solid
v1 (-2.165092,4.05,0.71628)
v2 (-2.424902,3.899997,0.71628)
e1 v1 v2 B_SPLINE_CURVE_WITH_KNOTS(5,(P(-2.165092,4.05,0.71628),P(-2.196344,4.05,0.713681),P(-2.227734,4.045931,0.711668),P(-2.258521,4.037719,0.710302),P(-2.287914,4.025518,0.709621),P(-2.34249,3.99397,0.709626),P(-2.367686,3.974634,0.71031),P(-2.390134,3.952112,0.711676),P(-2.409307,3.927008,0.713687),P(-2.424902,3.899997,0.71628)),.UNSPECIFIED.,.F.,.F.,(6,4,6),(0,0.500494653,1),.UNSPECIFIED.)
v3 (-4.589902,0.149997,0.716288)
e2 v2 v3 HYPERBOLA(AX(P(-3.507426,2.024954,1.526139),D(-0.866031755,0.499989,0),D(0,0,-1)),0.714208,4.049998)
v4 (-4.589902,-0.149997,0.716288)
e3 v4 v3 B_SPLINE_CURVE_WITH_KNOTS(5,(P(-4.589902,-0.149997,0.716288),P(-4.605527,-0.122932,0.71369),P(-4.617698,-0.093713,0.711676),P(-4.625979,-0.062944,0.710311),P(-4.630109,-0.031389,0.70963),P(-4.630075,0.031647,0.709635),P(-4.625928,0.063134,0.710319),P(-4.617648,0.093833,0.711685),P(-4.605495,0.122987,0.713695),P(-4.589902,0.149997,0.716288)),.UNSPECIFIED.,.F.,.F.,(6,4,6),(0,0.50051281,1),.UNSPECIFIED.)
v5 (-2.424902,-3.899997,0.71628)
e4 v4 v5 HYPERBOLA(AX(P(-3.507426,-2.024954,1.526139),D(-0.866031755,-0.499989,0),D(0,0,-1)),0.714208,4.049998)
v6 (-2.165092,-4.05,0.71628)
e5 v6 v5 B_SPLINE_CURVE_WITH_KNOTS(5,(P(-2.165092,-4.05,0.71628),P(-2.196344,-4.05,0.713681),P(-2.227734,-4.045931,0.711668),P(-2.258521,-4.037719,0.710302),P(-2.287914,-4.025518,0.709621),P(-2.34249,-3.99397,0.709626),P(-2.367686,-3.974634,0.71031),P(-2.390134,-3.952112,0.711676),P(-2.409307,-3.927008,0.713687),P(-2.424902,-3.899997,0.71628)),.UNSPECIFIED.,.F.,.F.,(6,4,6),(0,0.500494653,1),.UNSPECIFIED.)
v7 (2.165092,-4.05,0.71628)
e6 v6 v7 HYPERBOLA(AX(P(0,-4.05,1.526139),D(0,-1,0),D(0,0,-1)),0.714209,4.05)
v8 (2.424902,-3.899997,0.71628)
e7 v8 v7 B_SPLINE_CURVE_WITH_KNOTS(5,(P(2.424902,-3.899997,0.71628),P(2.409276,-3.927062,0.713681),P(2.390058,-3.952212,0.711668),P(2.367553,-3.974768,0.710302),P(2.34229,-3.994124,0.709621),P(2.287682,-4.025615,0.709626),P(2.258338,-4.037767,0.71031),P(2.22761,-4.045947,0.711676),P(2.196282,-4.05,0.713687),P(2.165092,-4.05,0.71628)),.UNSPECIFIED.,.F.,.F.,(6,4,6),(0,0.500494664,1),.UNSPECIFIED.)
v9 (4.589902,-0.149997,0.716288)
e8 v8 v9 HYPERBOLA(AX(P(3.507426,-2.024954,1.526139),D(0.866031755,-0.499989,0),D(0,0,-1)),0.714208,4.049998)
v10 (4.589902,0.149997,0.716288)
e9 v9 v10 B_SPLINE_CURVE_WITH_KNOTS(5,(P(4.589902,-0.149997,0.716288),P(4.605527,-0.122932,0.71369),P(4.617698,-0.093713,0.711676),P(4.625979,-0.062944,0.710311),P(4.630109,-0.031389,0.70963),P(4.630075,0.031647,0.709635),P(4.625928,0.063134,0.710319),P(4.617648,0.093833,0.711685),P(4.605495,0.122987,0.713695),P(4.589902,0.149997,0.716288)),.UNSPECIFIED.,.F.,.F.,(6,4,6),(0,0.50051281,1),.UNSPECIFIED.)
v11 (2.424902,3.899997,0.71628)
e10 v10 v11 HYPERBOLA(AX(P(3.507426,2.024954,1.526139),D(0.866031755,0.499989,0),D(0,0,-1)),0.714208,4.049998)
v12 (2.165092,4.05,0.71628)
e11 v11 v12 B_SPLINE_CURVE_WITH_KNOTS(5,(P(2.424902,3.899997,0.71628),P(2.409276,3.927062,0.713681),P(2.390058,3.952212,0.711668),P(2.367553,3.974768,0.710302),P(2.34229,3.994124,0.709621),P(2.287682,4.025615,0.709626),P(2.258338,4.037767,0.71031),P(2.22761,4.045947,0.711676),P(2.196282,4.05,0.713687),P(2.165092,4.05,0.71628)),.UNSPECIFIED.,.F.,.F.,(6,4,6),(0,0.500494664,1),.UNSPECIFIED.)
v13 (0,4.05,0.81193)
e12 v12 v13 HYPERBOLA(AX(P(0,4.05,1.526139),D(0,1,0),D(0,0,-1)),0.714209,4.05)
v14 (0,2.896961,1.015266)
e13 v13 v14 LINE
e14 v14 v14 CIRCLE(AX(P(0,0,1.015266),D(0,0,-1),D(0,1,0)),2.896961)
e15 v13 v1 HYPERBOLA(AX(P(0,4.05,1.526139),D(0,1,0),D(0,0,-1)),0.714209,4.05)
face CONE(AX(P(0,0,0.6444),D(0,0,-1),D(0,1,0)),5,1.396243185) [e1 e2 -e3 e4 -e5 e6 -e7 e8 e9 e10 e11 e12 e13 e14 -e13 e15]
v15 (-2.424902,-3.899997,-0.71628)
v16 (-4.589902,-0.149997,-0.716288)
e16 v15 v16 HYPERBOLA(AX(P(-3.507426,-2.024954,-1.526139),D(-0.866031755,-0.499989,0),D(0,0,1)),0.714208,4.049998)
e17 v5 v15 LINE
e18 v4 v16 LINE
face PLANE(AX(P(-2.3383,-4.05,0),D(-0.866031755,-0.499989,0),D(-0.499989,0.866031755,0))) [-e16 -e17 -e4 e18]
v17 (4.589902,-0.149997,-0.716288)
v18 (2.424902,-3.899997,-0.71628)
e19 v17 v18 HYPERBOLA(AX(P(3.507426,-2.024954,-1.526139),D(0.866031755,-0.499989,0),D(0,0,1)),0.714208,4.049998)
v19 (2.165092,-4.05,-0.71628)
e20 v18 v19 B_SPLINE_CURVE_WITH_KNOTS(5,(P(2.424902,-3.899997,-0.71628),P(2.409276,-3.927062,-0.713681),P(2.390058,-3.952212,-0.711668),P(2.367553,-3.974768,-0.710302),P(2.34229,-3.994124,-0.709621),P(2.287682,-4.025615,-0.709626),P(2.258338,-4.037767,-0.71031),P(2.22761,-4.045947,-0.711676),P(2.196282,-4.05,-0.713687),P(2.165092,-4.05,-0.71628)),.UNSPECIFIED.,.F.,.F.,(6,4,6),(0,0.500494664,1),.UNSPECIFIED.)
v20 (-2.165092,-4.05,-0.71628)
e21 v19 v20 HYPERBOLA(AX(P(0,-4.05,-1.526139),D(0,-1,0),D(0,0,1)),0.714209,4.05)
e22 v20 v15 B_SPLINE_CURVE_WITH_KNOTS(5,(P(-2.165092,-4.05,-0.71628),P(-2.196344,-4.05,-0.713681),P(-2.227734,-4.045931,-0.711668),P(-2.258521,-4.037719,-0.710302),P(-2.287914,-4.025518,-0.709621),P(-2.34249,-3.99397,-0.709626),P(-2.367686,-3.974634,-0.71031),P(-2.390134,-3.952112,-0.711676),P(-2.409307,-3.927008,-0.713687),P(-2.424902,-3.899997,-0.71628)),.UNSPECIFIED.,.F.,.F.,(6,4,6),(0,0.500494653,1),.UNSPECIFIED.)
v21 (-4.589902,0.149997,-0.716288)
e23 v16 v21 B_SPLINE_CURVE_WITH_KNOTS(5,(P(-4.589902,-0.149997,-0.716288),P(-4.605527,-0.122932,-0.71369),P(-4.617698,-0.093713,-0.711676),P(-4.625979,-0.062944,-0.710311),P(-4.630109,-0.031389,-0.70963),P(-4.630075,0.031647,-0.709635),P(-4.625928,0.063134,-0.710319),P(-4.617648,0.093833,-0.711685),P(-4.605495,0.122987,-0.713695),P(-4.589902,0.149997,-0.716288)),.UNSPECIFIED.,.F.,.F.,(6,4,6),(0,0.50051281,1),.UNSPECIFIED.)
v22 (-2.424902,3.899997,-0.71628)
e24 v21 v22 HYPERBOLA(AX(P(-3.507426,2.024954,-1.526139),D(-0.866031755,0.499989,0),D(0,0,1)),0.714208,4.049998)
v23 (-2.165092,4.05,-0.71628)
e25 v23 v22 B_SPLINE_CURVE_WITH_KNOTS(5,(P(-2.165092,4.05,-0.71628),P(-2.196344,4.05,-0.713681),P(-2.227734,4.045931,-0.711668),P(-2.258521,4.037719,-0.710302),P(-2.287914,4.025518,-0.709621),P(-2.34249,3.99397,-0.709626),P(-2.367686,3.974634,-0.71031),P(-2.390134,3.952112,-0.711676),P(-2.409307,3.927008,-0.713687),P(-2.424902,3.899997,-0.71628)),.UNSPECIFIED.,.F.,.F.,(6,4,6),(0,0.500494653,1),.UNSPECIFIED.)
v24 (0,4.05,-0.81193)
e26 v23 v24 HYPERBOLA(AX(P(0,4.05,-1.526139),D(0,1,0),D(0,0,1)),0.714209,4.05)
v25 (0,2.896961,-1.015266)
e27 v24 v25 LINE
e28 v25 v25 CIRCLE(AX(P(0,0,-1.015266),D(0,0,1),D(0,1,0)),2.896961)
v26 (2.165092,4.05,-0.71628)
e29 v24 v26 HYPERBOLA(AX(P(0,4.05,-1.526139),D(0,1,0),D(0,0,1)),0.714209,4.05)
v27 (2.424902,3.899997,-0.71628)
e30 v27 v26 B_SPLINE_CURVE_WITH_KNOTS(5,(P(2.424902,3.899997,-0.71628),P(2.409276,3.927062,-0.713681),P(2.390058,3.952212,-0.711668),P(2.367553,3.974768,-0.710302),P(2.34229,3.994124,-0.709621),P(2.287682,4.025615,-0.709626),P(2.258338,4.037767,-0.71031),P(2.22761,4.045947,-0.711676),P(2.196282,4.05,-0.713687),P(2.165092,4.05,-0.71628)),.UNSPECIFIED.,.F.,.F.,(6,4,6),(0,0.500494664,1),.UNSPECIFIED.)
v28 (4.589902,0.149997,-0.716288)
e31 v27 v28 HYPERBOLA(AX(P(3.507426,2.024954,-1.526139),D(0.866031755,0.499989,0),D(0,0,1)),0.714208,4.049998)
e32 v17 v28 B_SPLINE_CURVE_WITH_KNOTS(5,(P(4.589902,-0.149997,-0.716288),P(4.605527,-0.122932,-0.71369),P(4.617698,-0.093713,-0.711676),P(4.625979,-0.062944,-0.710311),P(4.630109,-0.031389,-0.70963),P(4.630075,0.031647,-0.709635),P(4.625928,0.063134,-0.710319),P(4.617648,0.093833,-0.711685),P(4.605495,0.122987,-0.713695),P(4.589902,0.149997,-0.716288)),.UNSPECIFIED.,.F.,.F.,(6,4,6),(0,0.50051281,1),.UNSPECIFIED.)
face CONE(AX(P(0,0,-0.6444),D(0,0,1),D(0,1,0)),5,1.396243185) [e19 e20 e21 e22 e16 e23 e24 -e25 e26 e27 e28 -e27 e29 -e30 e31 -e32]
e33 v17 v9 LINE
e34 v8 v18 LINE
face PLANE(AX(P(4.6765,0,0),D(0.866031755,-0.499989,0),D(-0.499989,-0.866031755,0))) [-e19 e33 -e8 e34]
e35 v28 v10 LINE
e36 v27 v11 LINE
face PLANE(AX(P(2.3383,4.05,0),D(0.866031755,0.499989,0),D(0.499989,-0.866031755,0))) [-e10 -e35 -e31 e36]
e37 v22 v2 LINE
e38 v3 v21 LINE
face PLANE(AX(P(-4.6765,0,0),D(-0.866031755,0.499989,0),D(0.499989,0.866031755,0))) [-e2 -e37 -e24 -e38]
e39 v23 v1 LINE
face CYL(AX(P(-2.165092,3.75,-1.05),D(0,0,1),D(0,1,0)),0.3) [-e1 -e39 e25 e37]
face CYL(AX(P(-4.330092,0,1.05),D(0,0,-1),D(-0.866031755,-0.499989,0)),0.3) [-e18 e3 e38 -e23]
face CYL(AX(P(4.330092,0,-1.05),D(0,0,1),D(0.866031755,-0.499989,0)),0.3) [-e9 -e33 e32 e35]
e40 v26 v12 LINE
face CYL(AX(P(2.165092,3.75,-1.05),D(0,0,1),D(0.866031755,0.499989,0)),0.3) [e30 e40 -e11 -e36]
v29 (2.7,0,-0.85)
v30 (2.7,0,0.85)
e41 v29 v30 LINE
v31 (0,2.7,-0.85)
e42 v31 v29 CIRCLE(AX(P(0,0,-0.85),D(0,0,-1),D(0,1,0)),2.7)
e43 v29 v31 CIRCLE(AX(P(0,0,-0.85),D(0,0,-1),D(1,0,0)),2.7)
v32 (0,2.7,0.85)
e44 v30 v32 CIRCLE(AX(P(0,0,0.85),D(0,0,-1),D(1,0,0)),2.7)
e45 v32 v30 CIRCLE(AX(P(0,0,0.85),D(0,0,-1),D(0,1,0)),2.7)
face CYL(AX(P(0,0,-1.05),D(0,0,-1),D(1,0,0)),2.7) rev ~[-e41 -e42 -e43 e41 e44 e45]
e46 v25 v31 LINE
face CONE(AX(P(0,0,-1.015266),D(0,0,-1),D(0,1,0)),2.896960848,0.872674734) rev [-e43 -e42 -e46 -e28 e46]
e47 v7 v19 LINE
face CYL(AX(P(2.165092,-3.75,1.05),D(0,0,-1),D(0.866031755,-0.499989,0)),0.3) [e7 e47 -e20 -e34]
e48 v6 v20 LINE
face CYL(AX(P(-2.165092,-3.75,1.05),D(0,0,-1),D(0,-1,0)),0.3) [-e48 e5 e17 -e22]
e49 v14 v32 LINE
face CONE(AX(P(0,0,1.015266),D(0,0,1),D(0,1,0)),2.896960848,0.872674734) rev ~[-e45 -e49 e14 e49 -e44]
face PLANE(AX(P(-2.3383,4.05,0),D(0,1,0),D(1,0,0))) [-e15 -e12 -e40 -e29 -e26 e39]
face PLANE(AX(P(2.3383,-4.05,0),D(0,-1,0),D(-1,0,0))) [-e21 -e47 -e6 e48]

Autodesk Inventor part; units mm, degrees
ref_plane "YZ Plane" through (0, 0, 0) normal (1, 0, 0) x (0, 1, 0)
ref_plane "XZ Plane" through (0, 0, 0) normal (0, 1, 0) x (-1, 0, 0)
ref_plane "XY Plane" through (0, 0, 0) normal (0, 0, 1) x (1, 0, 0)
sketch "Sketch1" plane through (0, 0, 0) normal (0, 0, 1) x (1, 0, 0)
  line L0 (4.6765, 0) -> (2.3383, -4.05)
  line L1 (2.3383, -4.05) -> (-2.3383, -4.05)
  line L2 (-2.3383, -4.05) -> (-4.6765, 0)
  line L3 (-4.6765, 0) -> (-2.3383, 4.05)
  line L4 (-2.3383, 4.05) -> (2.3383, 4.05)
  line L5 (2.3383, 4.05) -> (4.6765, 0)
  point P0 (0, 0)
  point P1 (0, 0)
  dimension "d0" = 8.1
extrude "Extrusion1" add sketch "Sketch1" along normal mid plane 2.1
sketch "Sketch2" plane through (0, 0, -1.05) normal (0, 0, -1) x (1, 0, 0)
  circle A0 centre (0, 0) radius 2.7
  dimension "d3" = 5.4
extrude "Extrusion2" cut sketch "Sketch2" against normal blind 2.1
fillet "Fillet2" radius 0.3 6 edges at (-2.3383, 4.05, 0) (2.3383, 4.05, 0) (-4.6765, 0, 0) (-2.3383, -4.05, 0) (2.3383, -4.05, 0) (4.6765, 0, 0)
sketch "Sketch4" plane through (0, 0, 0) normal (1, 0, 0) x (0, 1, 0)
  line L0 (2.7, 1.05) -> (5, 1.05)
  line L1 (5, 1.05) -> (5, 0.6444)
  line L2 (5, 0.6444) -> (2.7, 1.05)
  line L3 (-2.7, 1.05) -> (2.7, 1.05) projected
  line L4 (0, 6.5189) -> (0, -6.6611) construction
  line L5 (0, -9.297) -> (0, 9.1548) projected
  point P0 (0, 0)
  point P1 (5, 0.8472)
  dimension "d26" = 5
  dimension "d27" = 10
revolve "Revolution2" cut sketch "Sketch4" angle 360 about axis through (0, 0, 6.5189) along (0, 0, -1)
mirror "Mirror2" about plane through (0, 0, 0) normal (0, 0, 1) of "Revolution2"
chamfer "Chamfer4" distance 0.2 angle 45 4 edges at (-1.9092, -1.9092, 1.05) (1.9092, 1.9092, 1.05) (-1.9092, -1.9092, -1.05) (1.9092, 1.9092, -1.05)
properties part number "ecrou"
